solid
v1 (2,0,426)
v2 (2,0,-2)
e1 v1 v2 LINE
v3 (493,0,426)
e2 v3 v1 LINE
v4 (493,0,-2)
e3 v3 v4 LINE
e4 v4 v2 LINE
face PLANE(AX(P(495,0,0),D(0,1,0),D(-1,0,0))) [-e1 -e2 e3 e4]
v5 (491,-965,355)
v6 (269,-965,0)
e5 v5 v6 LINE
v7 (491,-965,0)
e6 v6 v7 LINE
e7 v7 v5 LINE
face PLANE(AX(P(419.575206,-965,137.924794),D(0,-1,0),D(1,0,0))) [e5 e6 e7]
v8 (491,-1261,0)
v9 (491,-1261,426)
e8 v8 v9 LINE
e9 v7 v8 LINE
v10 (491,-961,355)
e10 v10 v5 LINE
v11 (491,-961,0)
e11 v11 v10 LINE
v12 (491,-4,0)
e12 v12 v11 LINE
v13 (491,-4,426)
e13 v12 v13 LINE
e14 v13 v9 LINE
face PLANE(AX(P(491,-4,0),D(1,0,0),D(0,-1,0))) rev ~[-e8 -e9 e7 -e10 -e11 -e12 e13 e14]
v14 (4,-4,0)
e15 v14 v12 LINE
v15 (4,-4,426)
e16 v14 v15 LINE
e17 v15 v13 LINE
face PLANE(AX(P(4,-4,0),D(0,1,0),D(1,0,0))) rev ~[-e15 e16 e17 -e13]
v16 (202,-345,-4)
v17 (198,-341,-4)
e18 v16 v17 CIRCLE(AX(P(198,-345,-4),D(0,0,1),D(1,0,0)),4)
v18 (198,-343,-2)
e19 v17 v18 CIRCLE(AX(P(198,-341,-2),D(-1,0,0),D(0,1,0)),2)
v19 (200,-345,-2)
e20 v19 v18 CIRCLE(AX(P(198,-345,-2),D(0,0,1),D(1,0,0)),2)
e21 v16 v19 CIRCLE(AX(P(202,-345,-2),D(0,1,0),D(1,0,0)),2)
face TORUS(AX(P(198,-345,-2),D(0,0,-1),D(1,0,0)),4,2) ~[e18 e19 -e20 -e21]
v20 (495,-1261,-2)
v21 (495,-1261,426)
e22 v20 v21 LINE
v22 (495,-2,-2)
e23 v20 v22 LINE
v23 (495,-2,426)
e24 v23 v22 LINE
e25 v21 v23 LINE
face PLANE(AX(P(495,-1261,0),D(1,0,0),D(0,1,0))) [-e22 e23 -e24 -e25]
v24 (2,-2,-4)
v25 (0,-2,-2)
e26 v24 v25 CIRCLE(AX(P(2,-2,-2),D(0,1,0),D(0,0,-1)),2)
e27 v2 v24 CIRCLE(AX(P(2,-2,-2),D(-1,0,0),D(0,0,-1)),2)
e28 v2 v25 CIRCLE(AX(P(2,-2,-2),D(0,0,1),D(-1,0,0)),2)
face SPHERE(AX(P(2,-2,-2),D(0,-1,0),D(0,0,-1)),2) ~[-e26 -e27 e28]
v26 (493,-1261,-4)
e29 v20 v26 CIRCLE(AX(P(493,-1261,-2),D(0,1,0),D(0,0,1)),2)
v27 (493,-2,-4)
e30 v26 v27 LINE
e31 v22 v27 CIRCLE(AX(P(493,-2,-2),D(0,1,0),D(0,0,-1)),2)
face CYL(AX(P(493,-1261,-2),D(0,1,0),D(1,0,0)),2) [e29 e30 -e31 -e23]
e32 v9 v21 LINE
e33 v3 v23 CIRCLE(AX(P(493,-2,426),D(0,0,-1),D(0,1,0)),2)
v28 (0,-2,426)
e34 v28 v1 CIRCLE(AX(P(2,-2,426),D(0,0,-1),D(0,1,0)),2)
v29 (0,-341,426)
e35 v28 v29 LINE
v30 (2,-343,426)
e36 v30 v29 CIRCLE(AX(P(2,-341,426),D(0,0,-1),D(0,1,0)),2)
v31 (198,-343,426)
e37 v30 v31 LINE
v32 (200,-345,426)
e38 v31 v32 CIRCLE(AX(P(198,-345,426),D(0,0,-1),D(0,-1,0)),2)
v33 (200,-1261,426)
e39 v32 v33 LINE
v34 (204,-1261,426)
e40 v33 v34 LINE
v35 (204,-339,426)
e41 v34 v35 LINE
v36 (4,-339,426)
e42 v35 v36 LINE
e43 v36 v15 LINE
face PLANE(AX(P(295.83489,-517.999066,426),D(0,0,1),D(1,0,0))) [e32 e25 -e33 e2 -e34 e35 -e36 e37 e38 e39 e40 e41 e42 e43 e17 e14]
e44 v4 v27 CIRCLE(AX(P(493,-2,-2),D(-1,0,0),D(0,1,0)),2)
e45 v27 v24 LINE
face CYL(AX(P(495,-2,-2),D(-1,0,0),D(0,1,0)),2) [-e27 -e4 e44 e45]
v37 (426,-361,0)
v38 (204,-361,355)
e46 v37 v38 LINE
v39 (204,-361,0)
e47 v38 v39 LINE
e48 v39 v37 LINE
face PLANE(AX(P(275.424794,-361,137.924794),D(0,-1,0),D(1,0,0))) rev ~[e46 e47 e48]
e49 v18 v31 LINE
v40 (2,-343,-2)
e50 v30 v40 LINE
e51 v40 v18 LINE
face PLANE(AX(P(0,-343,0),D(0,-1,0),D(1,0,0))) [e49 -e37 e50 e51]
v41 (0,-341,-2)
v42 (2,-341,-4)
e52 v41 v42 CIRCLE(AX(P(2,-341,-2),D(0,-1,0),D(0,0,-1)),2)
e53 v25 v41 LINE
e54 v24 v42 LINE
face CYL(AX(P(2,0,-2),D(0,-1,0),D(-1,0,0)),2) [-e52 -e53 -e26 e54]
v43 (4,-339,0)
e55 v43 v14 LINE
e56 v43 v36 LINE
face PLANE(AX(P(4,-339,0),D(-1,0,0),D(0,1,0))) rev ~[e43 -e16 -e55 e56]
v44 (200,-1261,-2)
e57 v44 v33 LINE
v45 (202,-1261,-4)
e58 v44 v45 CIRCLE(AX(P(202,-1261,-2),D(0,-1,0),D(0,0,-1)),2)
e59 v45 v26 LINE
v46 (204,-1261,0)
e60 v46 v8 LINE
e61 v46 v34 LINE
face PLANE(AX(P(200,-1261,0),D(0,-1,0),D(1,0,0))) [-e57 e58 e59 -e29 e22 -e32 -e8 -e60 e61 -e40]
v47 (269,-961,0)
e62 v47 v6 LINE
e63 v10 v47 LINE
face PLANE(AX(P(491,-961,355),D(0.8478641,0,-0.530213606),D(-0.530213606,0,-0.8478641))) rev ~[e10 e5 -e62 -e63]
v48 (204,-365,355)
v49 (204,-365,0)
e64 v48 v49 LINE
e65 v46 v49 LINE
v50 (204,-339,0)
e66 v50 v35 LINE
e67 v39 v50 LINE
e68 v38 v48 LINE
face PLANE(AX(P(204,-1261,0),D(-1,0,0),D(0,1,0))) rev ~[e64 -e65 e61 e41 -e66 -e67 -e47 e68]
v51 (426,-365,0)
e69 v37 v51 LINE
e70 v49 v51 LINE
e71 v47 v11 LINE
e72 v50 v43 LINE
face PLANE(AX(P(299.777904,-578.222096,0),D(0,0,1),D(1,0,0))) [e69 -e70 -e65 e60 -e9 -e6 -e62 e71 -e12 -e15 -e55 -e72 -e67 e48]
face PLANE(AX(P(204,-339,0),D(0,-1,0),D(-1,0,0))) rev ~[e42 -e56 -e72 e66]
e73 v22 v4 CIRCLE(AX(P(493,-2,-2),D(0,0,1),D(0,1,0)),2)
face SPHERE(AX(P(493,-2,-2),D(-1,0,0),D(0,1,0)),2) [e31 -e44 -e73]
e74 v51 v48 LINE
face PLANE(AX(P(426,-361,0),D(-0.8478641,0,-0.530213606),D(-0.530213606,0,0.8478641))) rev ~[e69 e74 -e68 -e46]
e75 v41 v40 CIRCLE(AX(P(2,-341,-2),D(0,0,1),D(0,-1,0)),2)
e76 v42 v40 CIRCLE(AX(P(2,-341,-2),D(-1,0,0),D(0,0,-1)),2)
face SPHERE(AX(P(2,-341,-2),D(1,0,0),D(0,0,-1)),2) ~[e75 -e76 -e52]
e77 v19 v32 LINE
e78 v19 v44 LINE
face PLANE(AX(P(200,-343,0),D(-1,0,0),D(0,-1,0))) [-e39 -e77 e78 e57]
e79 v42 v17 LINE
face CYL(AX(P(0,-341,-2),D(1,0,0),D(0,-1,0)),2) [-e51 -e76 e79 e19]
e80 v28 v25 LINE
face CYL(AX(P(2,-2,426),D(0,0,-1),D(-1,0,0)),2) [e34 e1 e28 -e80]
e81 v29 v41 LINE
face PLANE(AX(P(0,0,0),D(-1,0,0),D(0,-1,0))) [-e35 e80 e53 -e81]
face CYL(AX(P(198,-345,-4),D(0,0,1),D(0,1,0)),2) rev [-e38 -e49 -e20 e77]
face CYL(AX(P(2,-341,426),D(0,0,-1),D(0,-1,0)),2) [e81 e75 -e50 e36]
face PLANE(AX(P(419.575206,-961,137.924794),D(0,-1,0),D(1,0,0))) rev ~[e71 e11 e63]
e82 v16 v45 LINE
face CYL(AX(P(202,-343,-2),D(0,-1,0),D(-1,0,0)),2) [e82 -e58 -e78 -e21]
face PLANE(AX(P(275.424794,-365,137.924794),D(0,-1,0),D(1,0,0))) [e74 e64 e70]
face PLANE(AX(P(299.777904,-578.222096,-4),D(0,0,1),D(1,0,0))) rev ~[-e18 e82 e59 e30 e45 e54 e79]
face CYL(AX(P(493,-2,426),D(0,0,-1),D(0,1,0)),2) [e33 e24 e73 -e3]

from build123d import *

# Parameters (mm, degrees)
F1_DEPTH  = 426
F3_DEPTH  = 4
F4_R      = 2
F7_DEPTH  = 4
F10_DEPTH = 4


# Not quite as in the source:
# - a feature names something its author has since deleted; it is built from what else it names


with BuildPart() as f1:
    # F0 (on Top) → F1 (new body)
    with BuildSketch(Plane.XY):
        Polygon((495, 0), (0, 0), (0, -343), (200, -343), (200, -1261), (204, -1261), (204, -339), (4, -339), (4, -4), (491, -4), (491, -1261), (495, -1261), align=None)
    extrude(amount=F1_DEPTH)

    # F2 (on Top) → F3 (join)
    with BuildSketch(Plane.XY):
        Polygon((0, -343), (200, -343), (200, -1261), (495, -1261), (495, 0), (0, 0), align=None)
    extrude(amount=-F3_DEPTH)

    # F4
    f4_edges = [f1.edges().sort_by_distance(p)[0] for p in [
        (100, -343, -4),
        (0, -171.5, -4),
        (247.5, 0, -4),
        (200, -343, 211),
        (0, -343, 211),
        (0, 0, 211),
        (495, 0, 211),
        (200, -802, -4),
        (495, -630.5, -4),
    ]]
    fillet(f4_edges, radius=F4_R)

    # F6 (on offset) → F7 (join)
    with BuildSketch(Plane.XZ.offset(961)):
        Polygon((269, 0), (491, 0), (491, 355), align=None)
    extrude(amount=F7_DEPTH)

    # F9 (on offset) → F10 (join)
    with BuildSketch(Plane.XZ.offset(361)):
        Polygon((204, 355), (204, 0), (426, 0), align=None)
    extrude(amount=F10_DEPTH)


solid = f1.part
